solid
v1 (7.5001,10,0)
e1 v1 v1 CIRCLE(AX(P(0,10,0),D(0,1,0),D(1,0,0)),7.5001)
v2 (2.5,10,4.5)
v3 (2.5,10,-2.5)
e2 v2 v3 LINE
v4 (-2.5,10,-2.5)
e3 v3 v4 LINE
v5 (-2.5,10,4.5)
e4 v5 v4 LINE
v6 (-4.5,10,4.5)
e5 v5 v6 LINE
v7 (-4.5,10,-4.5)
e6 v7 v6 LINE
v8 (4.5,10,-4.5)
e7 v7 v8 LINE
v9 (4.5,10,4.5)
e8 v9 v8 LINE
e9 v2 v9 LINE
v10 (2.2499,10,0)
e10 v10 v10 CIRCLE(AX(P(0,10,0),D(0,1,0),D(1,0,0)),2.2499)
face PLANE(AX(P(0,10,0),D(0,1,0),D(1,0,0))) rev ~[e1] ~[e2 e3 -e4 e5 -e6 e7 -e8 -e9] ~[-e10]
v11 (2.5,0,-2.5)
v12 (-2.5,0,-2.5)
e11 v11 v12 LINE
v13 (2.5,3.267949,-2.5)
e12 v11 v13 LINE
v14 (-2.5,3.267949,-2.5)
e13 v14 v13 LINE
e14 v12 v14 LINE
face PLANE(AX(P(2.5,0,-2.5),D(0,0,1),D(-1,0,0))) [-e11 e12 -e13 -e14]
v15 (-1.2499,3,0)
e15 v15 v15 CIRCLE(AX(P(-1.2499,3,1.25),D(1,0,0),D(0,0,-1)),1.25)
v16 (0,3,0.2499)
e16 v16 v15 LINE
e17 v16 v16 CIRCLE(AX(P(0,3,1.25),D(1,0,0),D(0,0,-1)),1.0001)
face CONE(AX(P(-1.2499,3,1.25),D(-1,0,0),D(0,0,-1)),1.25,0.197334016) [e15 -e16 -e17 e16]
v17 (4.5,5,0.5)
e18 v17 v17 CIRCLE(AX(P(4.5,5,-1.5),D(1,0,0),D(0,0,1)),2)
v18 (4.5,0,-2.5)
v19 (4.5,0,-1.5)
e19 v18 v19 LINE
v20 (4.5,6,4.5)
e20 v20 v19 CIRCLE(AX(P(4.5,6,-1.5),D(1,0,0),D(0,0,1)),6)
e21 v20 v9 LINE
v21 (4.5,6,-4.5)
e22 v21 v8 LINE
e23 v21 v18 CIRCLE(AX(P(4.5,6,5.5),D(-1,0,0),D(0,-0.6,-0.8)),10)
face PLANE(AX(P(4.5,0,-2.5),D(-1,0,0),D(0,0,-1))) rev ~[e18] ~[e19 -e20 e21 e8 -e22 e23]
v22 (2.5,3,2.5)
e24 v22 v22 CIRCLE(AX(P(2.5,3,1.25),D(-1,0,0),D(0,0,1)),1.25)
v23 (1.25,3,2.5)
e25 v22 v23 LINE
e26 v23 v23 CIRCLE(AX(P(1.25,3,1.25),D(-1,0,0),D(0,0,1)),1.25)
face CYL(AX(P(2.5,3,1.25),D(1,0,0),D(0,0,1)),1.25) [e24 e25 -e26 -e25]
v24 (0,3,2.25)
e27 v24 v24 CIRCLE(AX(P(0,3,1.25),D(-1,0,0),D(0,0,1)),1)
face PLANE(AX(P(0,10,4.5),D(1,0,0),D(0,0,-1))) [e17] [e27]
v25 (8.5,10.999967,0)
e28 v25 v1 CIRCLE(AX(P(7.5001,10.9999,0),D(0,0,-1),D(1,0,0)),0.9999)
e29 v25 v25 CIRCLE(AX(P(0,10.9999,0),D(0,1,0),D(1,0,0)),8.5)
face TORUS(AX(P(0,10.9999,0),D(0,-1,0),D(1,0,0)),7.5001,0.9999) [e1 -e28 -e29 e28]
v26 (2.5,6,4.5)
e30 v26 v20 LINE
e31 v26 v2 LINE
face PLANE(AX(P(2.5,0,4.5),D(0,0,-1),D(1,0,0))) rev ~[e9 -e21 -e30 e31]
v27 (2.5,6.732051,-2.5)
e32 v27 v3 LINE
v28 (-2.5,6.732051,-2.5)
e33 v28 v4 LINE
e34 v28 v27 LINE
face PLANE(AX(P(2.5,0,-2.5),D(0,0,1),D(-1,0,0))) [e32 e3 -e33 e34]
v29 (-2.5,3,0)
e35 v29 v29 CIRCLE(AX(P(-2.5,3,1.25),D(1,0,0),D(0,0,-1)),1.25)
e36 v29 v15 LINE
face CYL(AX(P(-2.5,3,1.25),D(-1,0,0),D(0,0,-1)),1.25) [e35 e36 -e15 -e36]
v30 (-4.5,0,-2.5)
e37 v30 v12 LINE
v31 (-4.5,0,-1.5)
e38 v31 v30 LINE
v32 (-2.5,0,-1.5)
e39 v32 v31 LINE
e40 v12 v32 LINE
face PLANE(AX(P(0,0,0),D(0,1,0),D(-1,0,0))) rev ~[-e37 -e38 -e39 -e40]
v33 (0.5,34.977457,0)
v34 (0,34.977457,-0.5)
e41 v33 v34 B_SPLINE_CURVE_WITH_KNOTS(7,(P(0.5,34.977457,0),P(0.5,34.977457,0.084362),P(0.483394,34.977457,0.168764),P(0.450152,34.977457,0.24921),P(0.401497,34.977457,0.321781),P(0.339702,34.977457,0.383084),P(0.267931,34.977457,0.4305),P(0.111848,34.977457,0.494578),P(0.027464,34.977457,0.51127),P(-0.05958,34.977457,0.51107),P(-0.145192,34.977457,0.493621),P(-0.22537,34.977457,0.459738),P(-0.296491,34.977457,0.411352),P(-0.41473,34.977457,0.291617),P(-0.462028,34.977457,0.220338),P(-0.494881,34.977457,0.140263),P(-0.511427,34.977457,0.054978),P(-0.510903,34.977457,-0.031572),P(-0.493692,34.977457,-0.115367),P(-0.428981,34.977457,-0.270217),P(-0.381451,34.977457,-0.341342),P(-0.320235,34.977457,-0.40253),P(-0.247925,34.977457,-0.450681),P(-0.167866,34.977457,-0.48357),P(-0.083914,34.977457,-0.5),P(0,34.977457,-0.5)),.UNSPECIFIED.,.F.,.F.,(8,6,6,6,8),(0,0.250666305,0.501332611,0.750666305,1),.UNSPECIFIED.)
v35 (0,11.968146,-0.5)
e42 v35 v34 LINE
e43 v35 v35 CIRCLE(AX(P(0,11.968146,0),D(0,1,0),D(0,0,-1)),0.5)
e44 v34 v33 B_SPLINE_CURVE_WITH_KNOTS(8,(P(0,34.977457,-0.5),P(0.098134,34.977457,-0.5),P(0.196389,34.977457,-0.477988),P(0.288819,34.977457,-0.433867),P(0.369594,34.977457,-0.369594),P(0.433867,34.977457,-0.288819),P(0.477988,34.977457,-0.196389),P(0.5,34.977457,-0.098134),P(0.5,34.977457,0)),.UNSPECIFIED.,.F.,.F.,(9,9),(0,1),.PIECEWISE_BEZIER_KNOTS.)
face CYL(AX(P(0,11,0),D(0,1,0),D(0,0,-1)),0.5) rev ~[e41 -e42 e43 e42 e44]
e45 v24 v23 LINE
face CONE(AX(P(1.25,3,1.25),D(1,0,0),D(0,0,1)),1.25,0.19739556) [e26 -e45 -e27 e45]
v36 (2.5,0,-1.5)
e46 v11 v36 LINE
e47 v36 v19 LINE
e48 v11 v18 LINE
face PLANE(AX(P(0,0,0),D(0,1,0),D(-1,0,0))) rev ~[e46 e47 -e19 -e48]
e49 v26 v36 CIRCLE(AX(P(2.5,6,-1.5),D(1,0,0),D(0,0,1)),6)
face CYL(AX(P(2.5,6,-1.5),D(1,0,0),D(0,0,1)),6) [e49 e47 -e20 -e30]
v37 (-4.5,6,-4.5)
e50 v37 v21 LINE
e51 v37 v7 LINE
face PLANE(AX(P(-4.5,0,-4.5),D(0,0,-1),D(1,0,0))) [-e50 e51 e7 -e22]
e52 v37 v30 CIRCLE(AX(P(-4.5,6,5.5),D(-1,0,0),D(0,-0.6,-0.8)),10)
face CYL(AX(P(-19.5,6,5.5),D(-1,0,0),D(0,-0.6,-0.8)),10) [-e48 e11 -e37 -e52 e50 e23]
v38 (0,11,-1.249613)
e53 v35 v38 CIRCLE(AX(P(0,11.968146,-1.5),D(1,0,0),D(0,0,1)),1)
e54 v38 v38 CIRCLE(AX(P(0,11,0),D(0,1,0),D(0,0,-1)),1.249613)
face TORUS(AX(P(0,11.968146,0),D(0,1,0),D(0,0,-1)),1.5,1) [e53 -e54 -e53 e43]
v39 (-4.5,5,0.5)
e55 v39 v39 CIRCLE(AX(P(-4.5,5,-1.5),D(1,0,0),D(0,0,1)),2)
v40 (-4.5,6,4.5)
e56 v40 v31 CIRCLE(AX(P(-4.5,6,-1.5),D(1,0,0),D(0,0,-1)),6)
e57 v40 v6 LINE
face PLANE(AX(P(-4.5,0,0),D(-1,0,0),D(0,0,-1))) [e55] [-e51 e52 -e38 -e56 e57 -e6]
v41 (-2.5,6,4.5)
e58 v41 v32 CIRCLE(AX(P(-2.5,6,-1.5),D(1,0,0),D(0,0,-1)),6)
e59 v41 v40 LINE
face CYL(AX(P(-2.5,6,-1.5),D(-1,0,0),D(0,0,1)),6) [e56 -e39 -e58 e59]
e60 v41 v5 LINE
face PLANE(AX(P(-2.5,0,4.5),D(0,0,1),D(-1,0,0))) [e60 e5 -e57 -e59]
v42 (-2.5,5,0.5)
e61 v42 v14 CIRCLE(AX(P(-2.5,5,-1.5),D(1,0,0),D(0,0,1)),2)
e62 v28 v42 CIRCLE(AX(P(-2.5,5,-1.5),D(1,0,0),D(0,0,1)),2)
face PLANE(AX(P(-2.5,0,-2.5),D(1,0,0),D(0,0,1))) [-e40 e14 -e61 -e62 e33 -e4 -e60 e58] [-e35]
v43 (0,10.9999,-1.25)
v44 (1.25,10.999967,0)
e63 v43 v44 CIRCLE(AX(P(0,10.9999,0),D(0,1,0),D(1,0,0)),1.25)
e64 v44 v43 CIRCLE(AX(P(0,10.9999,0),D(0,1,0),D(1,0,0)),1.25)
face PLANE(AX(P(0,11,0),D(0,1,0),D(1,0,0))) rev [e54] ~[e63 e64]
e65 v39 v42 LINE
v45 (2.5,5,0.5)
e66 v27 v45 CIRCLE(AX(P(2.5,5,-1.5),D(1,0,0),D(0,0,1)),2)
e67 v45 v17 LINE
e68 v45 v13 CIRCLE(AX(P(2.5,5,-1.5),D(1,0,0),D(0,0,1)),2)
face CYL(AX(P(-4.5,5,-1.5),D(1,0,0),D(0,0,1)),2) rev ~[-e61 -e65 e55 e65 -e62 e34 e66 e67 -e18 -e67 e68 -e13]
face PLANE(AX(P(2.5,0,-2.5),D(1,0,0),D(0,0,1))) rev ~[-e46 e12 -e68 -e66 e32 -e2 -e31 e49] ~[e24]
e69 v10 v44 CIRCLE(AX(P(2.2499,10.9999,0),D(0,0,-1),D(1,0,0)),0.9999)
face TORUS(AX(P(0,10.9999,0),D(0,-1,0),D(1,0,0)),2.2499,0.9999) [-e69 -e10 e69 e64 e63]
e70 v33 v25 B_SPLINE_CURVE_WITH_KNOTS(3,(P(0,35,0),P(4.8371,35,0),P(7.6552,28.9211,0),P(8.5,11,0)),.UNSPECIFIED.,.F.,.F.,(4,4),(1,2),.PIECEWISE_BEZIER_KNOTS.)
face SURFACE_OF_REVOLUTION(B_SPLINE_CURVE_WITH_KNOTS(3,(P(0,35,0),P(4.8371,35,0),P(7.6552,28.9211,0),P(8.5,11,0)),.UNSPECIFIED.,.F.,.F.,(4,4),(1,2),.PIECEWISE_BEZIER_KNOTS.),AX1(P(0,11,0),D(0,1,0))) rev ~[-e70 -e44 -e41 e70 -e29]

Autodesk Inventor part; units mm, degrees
ref_plane "YZ Plane" through (0, 0, 0) normal (1, 0, 0) x (0, 1, 0)
ref_plane "XZ Plane" through (0, 0, 0) normal (0, 1, 0) x (-1, 0, 0)
sketch "Sketch1" plane through (0, 0, 0) normal (0, 1, 0) x (-1, 0, 0)
  circle A0 centre (0, 0) radius 8.5
  line L0 (0, 0) -> (-2.5, 0)
  line L1 (-2.5, 0) -> (4.5, 0)
  line L2 (4.5, 0) -> (4.5, -2.5)
  line L3 (4.5, -2.5) -> (4.5, 4.5)
  line L4 (-4.5, 0) -> (-4.5, -2.5)
  line L5 (-4.5, 4.5) -> (-4.5, 0)
  line L6 (4.5, -4.5) -> (-4.5, -4.5)
  line L7 (-2.5, -2.5) -> (2.5, -2.5)
  line L8 (-2.5, -2.5) -> (-2.5, 4.5)
  line L9 (-2.5, 4.5) -> (-4.5, 4.5)
  line L10 (2.5, -2.5) -> (2.5, 4.5)
  line L11 (2.5, 4.5) -> (4.5, 4.5)
  line L12 (-4.5, -2.5) -> (-4.5, -4.5)
  line L13 (4.5, -4.5) -> (4.5, -2.5)
  point P0 (6.5, 0)
extrude "Extrusion1" add sketch "Sketch1" along normal blind 10 contours L8 L7 L10 L1 L2 L13 L6 L12 L4 L5 L9 | L10 L11 L3 L1
sketch "Sketch2" plane through (0, 10, 0) normal (0, 1, 0) x (1, 0, 0)
  circle A0 centre (0, 0) radius 8.5
  circle A1 centre (0, 0) radius 1.25
  dimension "d11" = 17
  dimension "d12" = 2.5
extrude "Extrusion2" add sketch "Sketch2" along normal blind 1
fillet "Fillet3" radius 1 1 edges at (-8.5, 10, 0)
fillet "Fillet4" radius 1 1 edges at (-1.25, 10, 0)
fillet "Fillet5" radius 6 2 edges at (3.5, 0, 4.5) (-3.5, 0, 4.5)
fillet "Fillet6" radius 10 1 edges at (0, 0, -4.5)
sketch "Sketch3" plane through (-4.5, 10, -4.5) normal (-1, 0, 0) x (0, 0, 1)
  arc A0 (3, -10) -> (9, -4) centre (3, -4) ccw projected
  line L0 (3, -10) -> (3, -5)
  point P0 (4.5, -10)
  dimension "d24" = 5
hole "Hole1" at (-4.5, 5, -1.5) direction (1, 0, 0) diameter 4 depth 10
sketch "Sketch4" plane through (2.5, 10, -2.5) normal (-1, 0, 0) x (0, 0, 1)
  line L0 (7, -4) -> (7, 0) projected
  circle A0 centre (3.75, -7) radius 1.25
  point P0 (2.5, -10)
extrude "Extrusion3" add sketch "Sketch4" along normal blind 2.5
chamfer "Chamfer1" distance 0.25 distance2 1.25 1 edges at (0, 3, 0) measured on face at (0, 2.3808, 1.5915)
sketch "Sketch5" plane through (-2.5, 10, 4.5) normal (1, 0, 0) x (0, 0, -1)
  circle A0 centre (3.25, -7) radius 1.25 projected
  circle A1 centre (3.25, -7) radius 1.25
  point P0 (4.5, -10)
extrude "Extrusion4" add sketch "Sketch5" along normal blind 2.5
chamfer "Chamfer2" distance 0.25 distance2 1.25 1 edges at (0, 3, 2.5) measured on face at (0, 2.8205, 0.1051)
ref_plane "Work Plane1" through (-1.25, 11, 0) normal (0, 0, 1) x (1, 0, 0)
sketch "Sketch7" plane through (-1.25, 11, 0) normal (0, 0, 1) x (1, 0, 0)
  line L0 (0, 0) -> (2.5, 0) projected
  line L1 (1.25, 0) -> (1.25, 25)
  line L2 (1.25, 0) -> (1.25, 24)
  line L3 (1.25, 24) -> (6.0871, 24) construction
  line L4 (6.0871, 24) -> (8.9052, 17.9211) construction
  line L5 (9.75, 0) -> (-7.25, 0) projected
  line L6 (8.9052, 17.9211) -> (9.75, 0) construction
  spline S0 degree 3 poles (1.25, 24) (6.0871, 24) (8.9052, 17.9211) (9.75, 0) knots 1 1 1 1 2 2 2 2
  line L7 (9.75, 0) -> (1.25, 0)
  point P0 (1.25, -11)
  dimension "d48" = 25
  dimension "d49" = 24
revolve "Revolution1" add sketch "Sketch7" angle 360 about axis through (0, 11, 0) along (0, 1, 0)
sketch "Sketch8" plane through (0, 11, 0) normal (0, -1, 0) x (1, 0, 0)
  circle A0 centre (0, 0) radius 1.25
hole "Hole2" at (0, 11, 0) direction (0, 1, 0) diameter 1 depth 40
fillet "Fillet7" radius 1 1 edges at (0, 11, 0.5)
properties part number "Index_3" material "ABS Plastic"
